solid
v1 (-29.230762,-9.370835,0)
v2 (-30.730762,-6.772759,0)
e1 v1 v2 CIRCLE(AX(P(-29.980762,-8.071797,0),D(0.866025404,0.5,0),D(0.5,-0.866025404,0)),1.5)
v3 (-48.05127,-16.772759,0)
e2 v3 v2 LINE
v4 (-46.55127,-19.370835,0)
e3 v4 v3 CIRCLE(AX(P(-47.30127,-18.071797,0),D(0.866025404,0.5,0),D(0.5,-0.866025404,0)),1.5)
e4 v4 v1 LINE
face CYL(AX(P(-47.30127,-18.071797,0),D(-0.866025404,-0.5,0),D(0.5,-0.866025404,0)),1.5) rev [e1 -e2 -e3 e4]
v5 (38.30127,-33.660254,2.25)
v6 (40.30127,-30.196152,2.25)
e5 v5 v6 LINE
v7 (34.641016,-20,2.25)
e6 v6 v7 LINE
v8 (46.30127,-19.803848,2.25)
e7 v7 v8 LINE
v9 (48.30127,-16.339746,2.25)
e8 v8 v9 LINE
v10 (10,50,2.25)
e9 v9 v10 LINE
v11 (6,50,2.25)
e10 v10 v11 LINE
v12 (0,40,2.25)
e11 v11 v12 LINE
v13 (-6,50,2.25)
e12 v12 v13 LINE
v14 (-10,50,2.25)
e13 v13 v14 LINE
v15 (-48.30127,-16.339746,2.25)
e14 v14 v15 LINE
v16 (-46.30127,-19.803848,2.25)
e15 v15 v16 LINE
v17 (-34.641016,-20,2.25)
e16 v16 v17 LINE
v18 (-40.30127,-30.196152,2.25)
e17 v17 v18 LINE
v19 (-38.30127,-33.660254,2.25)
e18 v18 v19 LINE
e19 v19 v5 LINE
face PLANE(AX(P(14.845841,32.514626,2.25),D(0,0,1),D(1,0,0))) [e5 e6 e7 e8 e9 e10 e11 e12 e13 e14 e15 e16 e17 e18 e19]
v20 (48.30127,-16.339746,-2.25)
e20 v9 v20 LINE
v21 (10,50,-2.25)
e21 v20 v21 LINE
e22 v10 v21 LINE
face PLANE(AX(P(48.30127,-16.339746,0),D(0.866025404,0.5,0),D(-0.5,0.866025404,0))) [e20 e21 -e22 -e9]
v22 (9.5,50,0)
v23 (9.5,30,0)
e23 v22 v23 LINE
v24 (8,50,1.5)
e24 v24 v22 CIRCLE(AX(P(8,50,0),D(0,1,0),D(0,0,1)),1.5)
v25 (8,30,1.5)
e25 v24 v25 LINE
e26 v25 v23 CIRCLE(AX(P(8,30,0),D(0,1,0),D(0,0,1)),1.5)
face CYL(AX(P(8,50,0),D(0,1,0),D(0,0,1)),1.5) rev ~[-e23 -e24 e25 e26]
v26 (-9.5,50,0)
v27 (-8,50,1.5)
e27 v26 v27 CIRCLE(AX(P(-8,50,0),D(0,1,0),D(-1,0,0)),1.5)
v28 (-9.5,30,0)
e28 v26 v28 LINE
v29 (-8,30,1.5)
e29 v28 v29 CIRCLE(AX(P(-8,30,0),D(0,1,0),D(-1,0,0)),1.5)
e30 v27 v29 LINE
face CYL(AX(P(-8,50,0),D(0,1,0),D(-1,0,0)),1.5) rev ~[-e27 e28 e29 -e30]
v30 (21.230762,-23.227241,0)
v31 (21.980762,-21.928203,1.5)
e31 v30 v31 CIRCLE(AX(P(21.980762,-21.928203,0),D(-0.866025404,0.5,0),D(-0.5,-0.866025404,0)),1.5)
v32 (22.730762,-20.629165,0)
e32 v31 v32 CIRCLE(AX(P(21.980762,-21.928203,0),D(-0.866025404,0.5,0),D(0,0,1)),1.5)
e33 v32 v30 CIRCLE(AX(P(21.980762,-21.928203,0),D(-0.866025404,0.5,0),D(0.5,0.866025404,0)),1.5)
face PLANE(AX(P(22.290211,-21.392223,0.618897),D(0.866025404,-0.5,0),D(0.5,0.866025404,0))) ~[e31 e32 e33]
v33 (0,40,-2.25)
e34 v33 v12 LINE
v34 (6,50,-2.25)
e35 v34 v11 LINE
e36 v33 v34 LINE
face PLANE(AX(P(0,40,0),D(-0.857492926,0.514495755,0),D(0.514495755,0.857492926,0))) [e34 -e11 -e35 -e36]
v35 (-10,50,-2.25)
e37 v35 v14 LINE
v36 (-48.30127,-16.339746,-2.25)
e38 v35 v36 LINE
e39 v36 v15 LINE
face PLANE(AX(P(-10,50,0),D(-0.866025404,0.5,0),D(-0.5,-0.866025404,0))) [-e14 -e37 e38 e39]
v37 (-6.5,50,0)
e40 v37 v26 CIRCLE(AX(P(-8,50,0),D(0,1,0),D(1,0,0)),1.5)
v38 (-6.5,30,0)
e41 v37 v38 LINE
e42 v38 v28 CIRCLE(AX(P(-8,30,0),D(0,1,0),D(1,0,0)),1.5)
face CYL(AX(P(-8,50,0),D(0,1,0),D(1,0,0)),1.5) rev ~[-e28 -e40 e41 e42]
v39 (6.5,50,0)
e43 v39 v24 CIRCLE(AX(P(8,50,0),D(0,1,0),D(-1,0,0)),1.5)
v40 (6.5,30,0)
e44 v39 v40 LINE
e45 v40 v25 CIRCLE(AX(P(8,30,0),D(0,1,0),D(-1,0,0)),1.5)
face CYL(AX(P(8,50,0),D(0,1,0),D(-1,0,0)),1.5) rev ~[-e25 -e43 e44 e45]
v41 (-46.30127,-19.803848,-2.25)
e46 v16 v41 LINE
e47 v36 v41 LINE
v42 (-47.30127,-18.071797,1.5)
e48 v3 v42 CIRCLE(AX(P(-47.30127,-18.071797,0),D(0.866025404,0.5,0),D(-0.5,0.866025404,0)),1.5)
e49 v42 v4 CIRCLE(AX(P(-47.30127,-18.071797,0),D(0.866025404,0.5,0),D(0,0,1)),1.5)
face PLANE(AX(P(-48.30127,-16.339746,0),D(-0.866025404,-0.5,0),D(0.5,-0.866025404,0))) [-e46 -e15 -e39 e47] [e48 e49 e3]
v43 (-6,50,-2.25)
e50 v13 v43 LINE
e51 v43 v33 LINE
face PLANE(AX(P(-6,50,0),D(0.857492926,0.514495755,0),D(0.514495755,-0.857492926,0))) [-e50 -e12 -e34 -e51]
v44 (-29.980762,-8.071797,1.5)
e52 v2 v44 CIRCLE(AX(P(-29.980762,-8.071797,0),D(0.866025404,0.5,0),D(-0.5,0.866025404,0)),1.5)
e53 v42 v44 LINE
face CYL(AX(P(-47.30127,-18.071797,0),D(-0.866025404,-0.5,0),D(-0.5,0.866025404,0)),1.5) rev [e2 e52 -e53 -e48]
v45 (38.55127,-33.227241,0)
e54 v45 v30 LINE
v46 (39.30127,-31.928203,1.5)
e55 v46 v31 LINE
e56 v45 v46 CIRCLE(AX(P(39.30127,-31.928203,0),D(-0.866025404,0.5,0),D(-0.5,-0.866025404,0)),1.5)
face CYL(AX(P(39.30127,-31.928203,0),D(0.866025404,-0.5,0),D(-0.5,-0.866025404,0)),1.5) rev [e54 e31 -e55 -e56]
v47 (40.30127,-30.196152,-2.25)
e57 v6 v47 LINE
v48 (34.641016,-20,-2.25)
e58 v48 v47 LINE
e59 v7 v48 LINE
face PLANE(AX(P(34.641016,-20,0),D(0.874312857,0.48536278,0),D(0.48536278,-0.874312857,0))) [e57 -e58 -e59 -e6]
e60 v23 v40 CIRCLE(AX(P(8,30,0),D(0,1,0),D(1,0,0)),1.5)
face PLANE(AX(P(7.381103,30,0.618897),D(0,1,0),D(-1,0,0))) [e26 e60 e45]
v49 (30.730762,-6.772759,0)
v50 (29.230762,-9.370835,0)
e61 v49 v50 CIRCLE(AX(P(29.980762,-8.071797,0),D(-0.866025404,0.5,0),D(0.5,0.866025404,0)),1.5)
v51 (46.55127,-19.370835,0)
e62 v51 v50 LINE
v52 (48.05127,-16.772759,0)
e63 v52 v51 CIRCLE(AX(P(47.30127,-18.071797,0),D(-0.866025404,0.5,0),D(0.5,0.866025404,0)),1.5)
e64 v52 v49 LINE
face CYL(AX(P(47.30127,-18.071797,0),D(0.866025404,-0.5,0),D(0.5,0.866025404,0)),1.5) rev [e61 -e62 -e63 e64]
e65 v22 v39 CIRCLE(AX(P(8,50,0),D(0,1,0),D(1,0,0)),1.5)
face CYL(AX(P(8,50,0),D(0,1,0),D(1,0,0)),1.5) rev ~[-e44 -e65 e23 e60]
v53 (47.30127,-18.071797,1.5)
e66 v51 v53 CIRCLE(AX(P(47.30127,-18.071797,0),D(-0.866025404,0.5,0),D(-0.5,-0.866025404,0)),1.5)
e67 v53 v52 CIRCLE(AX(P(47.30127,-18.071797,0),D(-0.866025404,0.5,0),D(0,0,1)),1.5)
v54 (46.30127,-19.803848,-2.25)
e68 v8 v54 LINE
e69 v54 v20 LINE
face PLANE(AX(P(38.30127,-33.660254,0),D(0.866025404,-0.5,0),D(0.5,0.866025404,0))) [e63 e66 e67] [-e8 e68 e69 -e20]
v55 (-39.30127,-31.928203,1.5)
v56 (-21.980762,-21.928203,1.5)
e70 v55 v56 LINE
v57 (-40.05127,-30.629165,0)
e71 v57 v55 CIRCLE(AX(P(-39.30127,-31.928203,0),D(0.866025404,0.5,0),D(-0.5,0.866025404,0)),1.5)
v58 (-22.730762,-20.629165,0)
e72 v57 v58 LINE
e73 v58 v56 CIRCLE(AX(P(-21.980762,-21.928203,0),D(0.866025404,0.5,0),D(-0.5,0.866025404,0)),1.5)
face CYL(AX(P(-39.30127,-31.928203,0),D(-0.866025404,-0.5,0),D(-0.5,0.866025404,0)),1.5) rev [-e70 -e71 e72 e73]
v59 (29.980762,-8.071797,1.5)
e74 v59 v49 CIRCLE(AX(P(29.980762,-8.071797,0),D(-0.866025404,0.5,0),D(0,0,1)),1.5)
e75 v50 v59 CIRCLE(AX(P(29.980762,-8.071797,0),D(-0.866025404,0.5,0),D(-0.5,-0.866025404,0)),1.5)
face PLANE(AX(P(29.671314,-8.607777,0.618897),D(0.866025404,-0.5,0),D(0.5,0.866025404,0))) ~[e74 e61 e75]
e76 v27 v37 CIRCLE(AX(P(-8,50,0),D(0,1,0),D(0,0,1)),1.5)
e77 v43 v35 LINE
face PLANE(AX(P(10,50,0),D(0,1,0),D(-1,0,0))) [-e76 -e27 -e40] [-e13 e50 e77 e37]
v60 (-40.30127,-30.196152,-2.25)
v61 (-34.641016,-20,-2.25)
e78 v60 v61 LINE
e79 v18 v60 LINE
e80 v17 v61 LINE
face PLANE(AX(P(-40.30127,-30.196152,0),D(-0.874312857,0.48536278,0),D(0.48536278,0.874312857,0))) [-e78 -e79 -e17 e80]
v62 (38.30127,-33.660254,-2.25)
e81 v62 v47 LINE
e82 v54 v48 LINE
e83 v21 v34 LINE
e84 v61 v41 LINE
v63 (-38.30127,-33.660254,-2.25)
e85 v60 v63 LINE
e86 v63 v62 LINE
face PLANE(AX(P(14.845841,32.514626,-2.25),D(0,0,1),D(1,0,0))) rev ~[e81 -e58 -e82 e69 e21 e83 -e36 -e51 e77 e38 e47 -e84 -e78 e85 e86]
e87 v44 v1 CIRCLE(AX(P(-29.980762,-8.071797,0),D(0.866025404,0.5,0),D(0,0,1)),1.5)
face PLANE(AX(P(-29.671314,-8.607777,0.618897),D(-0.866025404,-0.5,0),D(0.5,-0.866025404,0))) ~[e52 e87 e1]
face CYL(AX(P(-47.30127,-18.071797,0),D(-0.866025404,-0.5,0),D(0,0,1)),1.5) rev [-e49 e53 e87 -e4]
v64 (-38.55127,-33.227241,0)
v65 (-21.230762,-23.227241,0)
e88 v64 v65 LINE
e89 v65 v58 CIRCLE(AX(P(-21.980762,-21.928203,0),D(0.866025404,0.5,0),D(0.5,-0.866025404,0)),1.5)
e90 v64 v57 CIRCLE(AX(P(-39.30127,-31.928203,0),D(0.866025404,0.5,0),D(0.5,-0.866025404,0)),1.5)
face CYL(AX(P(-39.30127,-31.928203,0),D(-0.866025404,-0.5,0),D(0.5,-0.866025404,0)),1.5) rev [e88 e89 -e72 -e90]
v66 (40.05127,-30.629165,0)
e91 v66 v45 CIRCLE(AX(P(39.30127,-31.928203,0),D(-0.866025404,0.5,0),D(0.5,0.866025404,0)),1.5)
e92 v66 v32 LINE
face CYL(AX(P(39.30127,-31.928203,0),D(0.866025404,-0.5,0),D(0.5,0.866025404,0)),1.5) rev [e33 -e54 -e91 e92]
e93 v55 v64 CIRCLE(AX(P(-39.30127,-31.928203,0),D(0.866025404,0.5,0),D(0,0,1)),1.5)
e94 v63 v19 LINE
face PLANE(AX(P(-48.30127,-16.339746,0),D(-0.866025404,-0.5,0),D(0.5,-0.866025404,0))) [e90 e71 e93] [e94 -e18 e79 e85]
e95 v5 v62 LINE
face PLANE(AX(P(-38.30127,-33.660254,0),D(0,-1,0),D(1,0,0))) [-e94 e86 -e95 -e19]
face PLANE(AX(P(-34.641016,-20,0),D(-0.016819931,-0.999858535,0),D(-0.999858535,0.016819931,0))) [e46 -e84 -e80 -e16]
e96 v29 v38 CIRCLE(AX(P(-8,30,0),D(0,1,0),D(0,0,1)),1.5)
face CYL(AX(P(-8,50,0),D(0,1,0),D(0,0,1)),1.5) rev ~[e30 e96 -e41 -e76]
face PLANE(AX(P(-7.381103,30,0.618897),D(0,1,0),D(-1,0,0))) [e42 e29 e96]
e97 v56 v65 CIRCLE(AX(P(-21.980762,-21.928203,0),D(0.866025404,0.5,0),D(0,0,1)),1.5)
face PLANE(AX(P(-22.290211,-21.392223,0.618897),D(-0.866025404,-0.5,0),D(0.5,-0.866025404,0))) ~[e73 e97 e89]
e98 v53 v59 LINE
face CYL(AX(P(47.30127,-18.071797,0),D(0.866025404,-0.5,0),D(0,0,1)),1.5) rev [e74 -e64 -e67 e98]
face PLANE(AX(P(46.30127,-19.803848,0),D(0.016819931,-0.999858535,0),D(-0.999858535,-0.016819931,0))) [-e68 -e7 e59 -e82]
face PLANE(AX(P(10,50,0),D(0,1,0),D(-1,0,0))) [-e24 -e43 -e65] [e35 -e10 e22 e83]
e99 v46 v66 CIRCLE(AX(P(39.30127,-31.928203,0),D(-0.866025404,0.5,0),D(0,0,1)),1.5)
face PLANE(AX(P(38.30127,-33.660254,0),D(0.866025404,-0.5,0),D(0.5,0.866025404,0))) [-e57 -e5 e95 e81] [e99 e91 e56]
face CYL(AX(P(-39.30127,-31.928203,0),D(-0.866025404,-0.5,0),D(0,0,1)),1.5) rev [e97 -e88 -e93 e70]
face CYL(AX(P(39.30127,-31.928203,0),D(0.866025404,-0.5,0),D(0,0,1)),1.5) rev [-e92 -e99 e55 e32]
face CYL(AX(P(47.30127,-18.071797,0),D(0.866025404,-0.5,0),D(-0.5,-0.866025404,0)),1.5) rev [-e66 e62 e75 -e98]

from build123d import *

# Parameters (mm, degrees)
F1_DEPTH       = 2.25
F1_DEPTH_BACK  = 2.25
F3_DEPTH       = 20
F10_DEPTH      = 2.251
F10_DEPTH_BACK = 25


# Not quite as in the source:
# - a feature names something its author has since deleted; it is built from what else it names


with BuildPart() as f1:
    # F0 (on Top) → F1 (new body, two sides)
    with BuildSketch(Plane.XY) as f1_sk:
        Polygon((10, 50), (0, 50), (21.6506350946, 12.5), (29.1506350946, 16.8301270189), align=None)
        Polygon((-21.6506350946, 12.5), (0, 50), (-10, 50), (-29.1506350946, 16.8301270189), align=None)
        Polygon((21.6506350946, 12.5), (0, 50), (0, 0), align=None)
        Polygon((0, 0), (0, 50), (-21.6506350946, 12.5), align=None)
        Polygon((29.1506350946, 16.8301270189), (21.6506350946, 12.5), (43.3012701892, -25), (48.3012701892, -16.3397459622), align=None)
        Polygon((43.3012701892, -25), (21.6506350946, 12.5), (0, 0), align=None)
        Polygon((43.3012701892, -25), (0, 0), (-43.3012701892, -25), align=None)
        Polygon((-43.3012701892, -25), (0, 0), (-21.6506350946, 12.5), align=None)
        Polygon((-43.3012701892, -25), (-21.6506350946, 12.5), (-29.1506350946, 16.8301270189), (-48.3012701892, -16.3397459622), align=None)
        Polygon((38.3012701892, -33.6602540378), (43.3012701892, -25), (-43.3012701892, -25), (-38.3012701892, -33.6602540378), align=None)
    extrude(amount=F1_DEPTH)
    extrude(f1_sk.sketch, amount=-F1_DEPTH_BACK)


with BuildPart() as f3:
    # F2 (on face) → F3 (new body)
    with BuildSketch(Plane(origin=(0, 50, 0), x_dir=(-1, 0, 0), z_dir=(0, 1, 0))):
        with BuildLine():
            Line((-8, 0), (-6.5, 0))
            ThreePointArc((-6.5, 0), (-6.9393398282, 1.0606601718), (-8, 1.5))
            Line((-8, 1.5), (-8, 0))
        make_face()
        with BuildLine():
            ThreePointArc((-9.5, 0), (-8, -1.5), (-6.5, 0))
            Line((-6.5, 0), (-8, 0))
            Line((-8, 0), (-9.5, 0))
        make_face()
        with BuildLine():
            Line((-8, 0), (-8, 1.5))
            ThreePointArc((-8, 1.5), (-9.0606601718, 1.0606601718), (-9.5, 0))
            Line((-9.5, 0), (-8, 0))
        make_face()
    extrude(amount=-F3_DEPTH)


with BuildPart() as f3b:
    # F2 (on face) → F3, piece 2 (new body)
    with BuildSketch(Plane(origin=(0, 50, 0), x_dir=(-1, 0, 0), z_dir=(0, 1, 0))):
        with BuildLine():
            ThreePointArc((8, 1.5), (6.9393398282, 1.0606601718), (6.5, 0))
            Line((6.5, 0), (8, 0))
            Line((8, 0), (8, 1.5))
        make_face()
        with BuildLine():
            Line((8, 0), (6.5, 0))
            ThreePointArc((6.5, 0), (8, -1.5), (9.5, 0))
            Line((9.5, 0), (8, 0))
        make_face()
        with BuildLine():
            ThreePointArc((9.5, 0), (9.0606601718, 1.0606601718), (8, 1.5))
            Line((8, 1.5), (8, 0))
            Line((8, 0), (9.5, 0))
        make_face()
    extrude(amount=-F3_DEPTH)


with BuildPart() as f6_1:
    # F6: instance of F3
    add(f3.part.mirror(Plane(origin=(0, 0, 0), x_dir=(0.8660254038, 0.5, 0), z_dir=(0.5, -0.8660254038, 0))))


with BuildPart() as f6_2:
    # F6: instance of F3b
    add(f3b.part.mirror(Plane(origin=(0, 0, 0), x_dir=(0.8660254038, 0.5, 0), z_dir=(0.5, -0.8660254038, 0))))


with BuildPart() as f7_1:
    # F7: instance of F3
    add(f3.part.mirror(Plane(origin=(0, 0, 0), x_dir=(0.8660254038, -0.5, 0), z_dir=(-0.5, -0.8660254038, 0))))


with BuildPart() as f7_2:
    # F7: instance of F3b
    add(f3b.part.mirror(Plane(origin=(0, 0, 0), x_dir=(0.8660254038, -0.5, 0), z_dir=(-0.5, -0.8660254038, 0))))


with BuildPart() as f1_1:
    add(f1.part)

    # F8: cut F3, F3b, F6_1, F6_2, F7_2, F7_1
    add(f3.part, mode=Mode.SUBTRACT)
    add(f3b.part, mode=Mode.SUBTRACT)
    add(f6_1.part, mode=Mode.SUBTRACT)
    add(f6_2.part, mode=Mode.SUBTRACT)
    add(f7_2.part, mode=Mode.SUBTRACT)
    add(f7_1.part, mode=Mode.SUBTRACT)

    # F9 (on Top) → F10 (cut, two sides)
    with BuildSketch(Plane.XY) as f10_sk:
        Polygon((0, 50), (-6, 50), (0, 40), align=None)
        Polygon((0, 50), (0, 40), (6, 50), align=None)
        Polygon((-40.3012701892, -30.1961524227), (-34.6410161514, -20), (-43.3012701892, -25), align=None)
        Polygon((-43.3012701892, -25), (-34.6410161514, -20), (-46.3012701892, -19.8038475773), align=None)
        Polygon((34.6410161514, -20), (43.3012701892, -25), (46.3012701892, -19.8038475773), align=None)
        Polygon((40.3012701892, -30.1961524227), (43.3012701892, -25), (34.6410161514, -20), align=None)
    extrude(amount=-F10_DEPTH, mode=Mode.SUBTRACT)
    extrude(f10_sk.sketch, amount=F10_DEPTH_BACK, mode=Mode.SUBTRACT)


solid = f1_1.part
